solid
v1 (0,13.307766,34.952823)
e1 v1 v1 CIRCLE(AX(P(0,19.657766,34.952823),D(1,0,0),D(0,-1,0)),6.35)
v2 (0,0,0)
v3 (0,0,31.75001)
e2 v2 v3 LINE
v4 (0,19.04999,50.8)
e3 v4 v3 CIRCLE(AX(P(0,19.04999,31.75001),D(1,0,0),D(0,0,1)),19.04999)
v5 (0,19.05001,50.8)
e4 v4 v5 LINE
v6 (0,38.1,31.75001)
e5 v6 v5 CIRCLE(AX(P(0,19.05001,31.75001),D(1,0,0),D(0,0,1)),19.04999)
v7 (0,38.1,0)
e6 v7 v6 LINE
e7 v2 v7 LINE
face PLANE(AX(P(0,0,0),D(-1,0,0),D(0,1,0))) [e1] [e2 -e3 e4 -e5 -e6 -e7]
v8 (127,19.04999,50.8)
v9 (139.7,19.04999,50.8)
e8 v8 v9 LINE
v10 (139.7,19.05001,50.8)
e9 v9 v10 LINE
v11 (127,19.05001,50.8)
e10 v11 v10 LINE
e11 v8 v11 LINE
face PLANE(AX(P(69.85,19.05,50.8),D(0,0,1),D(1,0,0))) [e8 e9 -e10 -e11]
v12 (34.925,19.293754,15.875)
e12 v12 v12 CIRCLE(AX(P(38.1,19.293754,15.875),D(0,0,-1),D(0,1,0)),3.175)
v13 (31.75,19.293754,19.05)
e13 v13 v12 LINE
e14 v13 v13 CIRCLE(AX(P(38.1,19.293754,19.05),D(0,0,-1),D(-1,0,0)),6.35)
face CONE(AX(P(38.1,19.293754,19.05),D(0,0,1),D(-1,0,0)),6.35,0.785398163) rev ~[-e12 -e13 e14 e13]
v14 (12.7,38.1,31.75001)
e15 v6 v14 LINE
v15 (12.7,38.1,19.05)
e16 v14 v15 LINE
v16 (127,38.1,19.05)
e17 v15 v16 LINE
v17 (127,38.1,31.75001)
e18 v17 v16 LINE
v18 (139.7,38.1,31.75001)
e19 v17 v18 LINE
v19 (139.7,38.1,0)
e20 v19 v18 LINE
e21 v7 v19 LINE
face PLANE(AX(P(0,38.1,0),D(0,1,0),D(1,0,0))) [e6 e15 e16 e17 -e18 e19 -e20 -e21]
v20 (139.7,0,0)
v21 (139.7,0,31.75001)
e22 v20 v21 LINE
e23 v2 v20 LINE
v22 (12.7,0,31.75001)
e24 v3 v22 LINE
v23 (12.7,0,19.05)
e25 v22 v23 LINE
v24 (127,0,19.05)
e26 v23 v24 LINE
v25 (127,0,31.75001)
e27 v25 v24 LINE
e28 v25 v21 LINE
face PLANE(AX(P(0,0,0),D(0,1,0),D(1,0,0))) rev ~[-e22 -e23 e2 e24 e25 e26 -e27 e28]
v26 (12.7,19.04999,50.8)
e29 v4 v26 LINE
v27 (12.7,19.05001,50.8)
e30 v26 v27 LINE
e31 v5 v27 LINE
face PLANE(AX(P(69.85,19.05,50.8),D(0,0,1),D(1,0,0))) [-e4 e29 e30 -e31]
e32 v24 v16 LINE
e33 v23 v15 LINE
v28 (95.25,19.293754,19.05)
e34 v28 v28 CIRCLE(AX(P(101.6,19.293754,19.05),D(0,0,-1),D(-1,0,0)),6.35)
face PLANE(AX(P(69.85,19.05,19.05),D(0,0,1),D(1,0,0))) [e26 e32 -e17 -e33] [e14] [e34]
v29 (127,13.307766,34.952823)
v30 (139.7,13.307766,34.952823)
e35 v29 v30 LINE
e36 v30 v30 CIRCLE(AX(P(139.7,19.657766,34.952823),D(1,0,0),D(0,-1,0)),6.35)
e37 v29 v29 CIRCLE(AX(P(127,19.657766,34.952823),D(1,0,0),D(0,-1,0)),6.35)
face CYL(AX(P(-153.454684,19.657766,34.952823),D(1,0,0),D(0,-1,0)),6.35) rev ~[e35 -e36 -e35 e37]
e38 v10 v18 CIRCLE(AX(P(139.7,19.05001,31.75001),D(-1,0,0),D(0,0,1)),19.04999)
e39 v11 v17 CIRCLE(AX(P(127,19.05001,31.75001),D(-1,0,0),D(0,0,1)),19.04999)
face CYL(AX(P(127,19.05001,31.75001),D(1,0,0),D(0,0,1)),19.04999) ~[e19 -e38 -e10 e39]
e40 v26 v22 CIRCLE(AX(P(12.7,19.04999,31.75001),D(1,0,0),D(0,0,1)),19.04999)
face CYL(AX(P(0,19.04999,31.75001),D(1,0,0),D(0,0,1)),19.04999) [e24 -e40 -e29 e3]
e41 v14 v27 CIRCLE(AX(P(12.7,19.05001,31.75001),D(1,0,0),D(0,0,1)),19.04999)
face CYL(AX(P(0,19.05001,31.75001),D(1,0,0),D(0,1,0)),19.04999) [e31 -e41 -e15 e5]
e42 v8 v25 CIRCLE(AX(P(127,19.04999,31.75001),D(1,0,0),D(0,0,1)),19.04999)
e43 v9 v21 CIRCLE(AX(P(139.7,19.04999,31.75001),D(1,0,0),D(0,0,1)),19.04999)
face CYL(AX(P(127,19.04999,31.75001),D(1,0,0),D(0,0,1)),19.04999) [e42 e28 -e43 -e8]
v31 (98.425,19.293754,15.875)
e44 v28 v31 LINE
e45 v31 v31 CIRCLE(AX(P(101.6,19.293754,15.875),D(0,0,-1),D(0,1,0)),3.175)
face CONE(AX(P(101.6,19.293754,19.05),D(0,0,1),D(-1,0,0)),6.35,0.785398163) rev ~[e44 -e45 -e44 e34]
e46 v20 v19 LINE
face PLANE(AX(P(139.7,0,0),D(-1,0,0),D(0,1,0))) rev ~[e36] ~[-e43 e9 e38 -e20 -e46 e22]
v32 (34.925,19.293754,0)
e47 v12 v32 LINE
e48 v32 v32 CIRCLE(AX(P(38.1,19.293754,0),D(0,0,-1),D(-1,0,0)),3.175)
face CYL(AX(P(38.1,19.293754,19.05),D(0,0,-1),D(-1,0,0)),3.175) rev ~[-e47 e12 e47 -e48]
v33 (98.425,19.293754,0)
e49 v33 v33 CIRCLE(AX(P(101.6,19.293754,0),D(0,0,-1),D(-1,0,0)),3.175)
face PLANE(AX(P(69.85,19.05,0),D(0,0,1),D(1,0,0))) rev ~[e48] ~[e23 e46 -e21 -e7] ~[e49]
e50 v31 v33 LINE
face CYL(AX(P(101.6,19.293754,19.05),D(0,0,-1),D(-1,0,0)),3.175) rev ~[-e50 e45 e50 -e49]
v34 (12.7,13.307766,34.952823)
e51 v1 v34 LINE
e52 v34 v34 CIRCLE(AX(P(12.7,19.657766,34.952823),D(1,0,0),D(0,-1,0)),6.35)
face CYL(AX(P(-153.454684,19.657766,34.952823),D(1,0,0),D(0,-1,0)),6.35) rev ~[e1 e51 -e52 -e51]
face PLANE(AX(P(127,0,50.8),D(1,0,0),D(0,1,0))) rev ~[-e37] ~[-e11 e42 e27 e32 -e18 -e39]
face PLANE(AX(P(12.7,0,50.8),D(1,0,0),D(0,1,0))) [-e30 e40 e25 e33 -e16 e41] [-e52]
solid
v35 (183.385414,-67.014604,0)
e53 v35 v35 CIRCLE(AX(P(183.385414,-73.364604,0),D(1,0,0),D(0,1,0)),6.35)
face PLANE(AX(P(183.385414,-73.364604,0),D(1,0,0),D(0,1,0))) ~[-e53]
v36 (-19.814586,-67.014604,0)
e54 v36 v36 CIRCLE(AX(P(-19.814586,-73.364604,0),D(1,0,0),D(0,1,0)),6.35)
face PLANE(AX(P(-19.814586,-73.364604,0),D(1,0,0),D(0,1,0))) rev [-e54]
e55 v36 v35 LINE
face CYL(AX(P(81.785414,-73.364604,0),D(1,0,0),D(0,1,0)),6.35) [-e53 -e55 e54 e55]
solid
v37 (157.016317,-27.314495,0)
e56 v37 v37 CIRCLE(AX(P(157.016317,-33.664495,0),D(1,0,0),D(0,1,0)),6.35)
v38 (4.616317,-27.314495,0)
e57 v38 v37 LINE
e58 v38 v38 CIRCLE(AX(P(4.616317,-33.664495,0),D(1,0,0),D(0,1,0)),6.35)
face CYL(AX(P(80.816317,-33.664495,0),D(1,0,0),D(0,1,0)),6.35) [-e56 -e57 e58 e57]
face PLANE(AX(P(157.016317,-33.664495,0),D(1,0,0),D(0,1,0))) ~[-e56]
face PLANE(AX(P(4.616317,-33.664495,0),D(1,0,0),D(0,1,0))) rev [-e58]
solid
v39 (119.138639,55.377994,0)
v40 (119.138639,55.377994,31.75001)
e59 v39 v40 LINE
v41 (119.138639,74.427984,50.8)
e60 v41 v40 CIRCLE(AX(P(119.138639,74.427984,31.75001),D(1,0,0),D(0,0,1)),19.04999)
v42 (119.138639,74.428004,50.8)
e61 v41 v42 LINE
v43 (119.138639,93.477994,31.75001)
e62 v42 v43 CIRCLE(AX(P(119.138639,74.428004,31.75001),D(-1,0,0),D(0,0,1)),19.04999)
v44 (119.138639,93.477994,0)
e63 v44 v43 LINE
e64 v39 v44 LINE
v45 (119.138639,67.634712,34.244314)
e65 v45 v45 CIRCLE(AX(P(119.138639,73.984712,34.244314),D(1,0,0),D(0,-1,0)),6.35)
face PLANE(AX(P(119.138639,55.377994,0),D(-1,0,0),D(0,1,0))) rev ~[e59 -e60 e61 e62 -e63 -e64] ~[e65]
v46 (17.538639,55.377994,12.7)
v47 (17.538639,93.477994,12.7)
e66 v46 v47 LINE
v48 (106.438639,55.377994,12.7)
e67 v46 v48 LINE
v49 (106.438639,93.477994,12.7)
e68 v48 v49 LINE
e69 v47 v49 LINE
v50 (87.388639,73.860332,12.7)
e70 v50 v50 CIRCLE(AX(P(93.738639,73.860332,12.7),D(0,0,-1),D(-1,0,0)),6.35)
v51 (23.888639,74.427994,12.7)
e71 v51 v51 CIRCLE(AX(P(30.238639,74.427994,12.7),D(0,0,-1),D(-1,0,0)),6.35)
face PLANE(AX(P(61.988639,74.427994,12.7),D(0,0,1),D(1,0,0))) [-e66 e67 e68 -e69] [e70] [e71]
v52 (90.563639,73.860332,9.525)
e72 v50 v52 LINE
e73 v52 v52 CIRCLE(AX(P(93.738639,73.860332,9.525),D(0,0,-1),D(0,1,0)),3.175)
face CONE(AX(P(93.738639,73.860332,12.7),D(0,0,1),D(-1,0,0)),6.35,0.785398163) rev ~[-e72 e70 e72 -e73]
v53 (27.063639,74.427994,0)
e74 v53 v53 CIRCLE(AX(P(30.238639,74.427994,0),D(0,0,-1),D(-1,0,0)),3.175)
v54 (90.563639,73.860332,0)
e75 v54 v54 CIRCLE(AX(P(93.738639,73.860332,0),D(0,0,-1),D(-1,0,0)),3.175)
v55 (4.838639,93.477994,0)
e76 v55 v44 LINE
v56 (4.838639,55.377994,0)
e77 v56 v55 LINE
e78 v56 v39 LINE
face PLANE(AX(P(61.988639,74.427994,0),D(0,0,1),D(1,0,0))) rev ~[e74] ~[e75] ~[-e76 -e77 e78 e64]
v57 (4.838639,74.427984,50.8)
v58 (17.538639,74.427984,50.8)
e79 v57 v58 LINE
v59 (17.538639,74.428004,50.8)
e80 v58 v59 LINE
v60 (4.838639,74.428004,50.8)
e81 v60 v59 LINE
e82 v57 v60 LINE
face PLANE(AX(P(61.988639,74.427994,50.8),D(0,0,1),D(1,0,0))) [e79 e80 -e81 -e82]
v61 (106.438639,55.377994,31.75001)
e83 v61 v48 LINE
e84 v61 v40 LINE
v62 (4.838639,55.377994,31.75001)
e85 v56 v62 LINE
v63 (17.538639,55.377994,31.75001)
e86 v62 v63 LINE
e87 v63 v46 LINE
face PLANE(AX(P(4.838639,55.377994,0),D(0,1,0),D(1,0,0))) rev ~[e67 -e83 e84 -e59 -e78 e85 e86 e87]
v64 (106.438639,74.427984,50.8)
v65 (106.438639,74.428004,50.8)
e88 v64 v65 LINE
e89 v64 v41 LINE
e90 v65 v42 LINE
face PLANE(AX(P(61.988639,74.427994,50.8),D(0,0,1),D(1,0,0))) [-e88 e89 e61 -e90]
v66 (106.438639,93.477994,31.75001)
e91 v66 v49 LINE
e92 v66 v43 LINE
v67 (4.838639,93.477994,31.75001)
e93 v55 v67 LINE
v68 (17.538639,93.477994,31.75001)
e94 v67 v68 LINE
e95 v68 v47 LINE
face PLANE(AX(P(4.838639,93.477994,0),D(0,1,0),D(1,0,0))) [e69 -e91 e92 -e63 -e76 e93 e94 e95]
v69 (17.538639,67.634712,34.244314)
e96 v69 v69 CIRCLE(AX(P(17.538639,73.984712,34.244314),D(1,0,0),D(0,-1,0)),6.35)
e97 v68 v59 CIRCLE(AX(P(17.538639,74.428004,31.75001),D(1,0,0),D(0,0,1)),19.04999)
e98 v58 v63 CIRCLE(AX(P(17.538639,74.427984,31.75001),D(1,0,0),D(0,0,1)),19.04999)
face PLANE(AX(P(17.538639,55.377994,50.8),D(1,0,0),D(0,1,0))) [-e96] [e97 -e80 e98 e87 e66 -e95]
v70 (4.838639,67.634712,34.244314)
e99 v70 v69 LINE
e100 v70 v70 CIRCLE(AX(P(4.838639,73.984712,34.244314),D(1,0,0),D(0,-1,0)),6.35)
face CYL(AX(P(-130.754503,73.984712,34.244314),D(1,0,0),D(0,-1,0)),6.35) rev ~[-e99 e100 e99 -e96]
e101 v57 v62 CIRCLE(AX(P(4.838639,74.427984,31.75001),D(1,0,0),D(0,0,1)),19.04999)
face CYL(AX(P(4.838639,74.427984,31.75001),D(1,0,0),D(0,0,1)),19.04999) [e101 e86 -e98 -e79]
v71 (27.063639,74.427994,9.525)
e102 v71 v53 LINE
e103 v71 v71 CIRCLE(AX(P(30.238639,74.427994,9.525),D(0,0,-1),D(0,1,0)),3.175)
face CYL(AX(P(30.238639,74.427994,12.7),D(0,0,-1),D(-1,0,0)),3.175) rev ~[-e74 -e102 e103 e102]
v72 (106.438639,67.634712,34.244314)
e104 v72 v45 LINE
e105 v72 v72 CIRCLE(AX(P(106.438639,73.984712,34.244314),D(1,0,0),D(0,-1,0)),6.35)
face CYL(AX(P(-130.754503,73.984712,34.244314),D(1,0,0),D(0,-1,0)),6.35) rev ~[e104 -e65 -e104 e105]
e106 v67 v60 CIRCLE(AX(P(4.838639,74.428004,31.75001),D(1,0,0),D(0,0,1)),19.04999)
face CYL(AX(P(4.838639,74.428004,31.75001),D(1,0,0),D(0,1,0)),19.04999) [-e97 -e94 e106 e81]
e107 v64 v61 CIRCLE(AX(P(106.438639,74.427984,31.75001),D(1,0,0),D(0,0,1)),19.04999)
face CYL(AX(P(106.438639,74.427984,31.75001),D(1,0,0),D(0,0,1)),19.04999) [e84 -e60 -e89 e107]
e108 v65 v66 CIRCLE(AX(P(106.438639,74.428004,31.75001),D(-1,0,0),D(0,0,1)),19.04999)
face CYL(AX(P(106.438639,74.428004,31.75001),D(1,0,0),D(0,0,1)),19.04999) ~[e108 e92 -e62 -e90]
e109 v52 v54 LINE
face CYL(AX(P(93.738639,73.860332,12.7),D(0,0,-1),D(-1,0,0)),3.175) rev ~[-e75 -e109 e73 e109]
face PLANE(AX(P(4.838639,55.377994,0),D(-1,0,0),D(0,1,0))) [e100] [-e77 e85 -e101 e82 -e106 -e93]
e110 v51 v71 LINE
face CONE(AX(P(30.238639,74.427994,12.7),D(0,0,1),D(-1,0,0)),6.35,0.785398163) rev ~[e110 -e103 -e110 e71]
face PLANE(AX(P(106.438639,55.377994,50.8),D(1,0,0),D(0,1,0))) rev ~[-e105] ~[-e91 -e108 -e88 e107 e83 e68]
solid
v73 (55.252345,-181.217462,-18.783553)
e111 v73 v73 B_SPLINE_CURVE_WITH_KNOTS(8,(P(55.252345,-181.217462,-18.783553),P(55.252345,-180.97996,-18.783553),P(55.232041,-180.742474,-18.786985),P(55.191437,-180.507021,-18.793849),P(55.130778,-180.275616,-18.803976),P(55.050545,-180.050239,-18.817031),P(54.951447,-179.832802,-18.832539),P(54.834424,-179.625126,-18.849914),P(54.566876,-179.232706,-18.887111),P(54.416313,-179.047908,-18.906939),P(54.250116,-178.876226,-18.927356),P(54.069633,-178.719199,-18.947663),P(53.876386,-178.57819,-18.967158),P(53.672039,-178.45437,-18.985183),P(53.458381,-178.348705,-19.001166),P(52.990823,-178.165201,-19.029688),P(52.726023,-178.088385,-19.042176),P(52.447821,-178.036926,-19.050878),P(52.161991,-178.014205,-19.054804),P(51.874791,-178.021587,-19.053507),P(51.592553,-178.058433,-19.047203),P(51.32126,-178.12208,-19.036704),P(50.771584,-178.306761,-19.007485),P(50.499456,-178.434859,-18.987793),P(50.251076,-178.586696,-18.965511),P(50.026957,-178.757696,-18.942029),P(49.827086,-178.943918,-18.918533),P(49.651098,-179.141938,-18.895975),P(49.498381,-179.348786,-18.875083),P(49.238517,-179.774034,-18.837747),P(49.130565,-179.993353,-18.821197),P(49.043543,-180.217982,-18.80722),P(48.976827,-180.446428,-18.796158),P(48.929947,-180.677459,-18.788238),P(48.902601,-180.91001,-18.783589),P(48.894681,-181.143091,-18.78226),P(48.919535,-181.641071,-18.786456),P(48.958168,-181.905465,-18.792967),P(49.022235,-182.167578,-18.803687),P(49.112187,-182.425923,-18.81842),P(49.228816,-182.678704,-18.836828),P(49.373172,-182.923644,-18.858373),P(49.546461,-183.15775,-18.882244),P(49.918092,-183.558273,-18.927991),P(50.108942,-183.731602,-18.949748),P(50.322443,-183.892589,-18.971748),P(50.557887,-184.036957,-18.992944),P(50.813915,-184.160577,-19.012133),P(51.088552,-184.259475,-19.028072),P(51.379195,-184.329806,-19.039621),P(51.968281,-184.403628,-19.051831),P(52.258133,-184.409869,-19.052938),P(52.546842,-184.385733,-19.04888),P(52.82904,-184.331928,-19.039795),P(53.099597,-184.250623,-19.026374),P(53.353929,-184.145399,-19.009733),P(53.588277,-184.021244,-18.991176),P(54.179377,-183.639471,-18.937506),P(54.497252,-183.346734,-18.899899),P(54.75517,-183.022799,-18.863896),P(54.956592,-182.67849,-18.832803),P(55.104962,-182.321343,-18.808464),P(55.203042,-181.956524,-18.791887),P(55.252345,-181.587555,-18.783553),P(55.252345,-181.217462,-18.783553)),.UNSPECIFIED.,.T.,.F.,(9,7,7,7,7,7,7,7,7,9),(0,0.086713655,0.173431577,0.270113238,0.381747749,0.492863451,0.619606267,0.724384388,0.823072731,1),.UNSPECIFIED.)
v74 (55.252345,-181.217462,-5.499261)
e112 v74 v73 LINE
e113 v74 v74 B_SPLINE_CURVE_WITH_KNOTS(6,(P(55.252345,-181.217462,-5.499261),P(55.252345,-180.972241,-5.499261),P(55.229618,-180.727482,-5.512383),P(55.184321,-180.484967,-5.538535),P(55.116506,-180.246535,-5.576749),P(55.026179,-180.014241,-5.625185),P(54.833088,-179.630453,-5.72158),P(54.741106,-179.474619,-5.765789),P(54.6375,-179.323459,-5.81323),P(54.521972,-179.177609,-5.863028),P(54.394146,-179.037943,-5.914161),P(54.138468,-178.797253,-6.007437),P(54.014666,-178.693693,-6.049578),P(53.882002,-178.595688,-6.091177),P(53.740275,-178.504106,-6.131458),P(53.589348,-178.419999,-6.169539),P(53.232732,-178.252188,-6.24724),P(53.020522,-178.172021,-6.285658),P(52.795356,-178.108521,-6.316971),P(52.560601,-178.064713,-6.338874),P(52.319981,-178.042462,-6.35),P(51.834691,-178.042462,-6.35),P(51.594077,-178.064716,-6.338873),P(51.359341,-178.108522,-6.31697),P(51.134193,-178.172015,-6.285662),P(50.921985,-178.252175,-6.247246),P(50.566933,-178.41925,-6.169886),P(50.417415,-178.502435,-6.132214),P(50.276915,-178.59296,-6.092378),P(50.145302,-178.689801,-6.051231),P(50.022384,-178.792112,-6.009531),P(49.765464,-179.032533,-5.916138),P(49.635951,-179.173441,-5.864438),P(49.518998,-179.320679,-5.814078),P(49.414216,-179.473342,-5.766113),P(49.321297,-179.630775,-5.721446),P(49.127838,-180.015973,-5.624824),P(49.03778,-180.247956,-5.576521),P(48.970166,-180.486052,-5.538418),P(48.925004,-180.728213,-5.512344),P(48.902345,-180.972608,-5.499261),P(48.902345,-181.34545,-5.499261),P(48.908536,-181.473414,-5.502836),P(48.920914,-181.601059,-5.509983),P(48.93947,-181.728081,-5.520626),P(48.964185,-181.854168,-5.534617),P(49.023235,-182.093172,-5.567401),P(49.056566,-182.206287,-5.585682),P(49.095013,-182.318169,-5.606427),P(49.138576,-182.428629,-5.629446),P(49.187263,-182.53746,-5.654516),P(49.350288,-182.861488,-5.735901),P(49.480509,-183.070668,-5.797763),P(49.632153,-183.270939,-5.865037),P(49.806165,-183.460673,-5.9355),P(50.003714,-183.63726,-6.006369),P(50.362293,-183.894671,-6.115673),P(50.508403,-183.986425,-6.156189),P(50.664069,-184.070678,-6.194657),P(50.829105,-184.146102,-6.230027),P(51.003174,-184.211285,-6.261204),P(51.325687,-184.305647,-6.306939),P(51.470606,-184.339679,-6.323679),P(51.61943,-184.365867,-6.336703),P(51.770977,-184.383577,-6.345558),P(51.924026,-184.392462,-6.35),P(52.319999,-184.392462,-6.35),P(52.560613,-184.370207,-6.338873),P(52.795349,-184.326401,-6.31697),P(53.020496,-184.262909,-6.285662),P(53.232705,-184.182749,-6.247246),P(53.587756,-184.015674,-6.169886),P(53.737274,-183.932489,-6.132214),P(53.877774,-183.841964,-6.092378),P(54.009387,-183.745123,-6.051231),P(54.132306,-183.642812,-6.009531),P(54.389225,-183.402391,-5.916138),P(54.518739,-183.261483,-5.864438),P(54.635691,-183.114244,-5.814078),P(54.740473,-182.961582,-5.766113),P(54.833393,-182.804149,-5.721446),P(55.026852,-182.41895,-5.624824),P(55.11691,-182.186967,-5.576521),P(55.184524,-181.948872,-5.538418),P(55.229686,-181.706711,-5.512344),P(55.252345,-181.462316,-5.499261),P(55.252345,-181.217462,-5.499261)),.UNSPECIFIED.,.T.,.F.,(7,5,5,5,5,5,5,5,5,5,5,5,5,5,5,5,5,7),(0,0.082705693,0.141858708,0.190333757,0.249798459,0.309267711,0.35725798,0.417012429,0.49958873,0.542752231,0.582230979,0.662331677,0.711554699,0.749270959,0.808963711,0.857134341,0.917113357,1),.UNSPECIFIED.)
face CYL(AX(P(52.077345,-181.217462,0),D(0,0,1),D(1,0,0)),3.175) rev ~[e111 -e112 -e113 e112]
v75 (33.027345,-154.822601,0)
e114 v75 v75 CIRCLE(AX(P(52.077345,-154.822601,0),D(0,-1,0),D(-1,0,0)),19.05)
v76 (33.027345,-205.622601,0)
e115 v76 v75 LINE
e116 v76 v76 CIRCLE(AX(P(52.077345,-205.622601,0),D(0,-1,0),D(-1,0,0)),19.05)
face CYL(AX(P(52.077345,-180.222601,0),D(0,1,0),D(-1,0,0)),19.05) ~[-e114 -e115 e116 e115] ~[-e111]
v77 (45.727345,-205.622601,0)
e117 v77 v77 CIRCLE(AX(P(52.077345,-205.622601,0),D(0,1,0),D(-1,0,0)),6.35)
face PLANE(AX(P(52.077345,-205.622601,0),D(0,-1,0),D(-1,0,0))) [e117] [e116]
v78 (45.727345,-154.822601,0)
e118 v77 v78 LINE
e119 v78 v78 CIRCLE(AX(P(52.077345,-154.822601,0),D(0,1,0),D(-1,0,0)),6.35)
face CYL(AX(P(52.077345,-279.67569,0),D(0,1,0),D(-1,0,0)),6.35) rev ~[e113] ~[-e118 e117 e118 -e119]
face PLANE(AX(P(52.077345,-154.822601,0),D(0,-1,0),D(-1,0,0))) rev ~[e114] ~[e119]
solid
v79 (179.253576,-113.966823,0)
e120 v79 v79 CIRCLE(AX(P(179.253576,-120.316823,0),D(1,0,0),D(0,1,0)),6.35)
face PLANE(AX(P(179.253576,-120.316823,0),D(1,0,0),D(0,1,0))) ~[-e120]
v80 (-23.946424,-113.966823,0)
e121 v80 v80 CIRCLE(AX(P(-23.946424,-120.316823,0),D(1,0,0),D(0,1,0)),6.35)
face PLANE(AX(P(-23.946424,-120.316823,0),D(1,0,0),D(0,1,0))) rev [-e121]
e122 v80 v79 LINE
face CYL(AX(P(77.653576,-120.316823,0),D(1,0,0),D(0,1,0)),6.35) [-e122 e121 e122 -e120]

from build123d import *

# Parameters (mm, degrees)
F0_W            = 139.7
F0_H            = 38.1
F1_DEPTH        = 50.8
F2_W            = 114.3
F2_H            = 38.1
F3_DEPTH        = 31.75
F5_D            = 12.7
F7_D            = 6.35
F7_CSINK_D      = 12.7
F7_CSINK_ANGLE  = 90
F8_D            = 6.35
F8_CSINK_D      = 12.7
F8_CSINK_ANGLE  = 90
F9_W            = 114.3
F9_H            = 38.1
F10_DEPTH       = 50.8
F11_W           = 88.9
F11_H           = 38.1
F12_DEPTH       = 38.1
F14_D           = 12.7
F16_D           = 6.35
F16_CSINK_D     = 12.7
F16_CSINK_ANGLE = 90
F17_W           = 152.4
F17_H           = 6.35
F19_R           = 19.04999
F19_2_R         = 19.04999
F20_W           = 203.2
F20_H           = 6.35
F22_W           = 203.2
F22_H           = 6.35
F24_W           = 19.05
F24_H           = 50.8
F27_D           = 6.35
F27_DEPTH       = 19.051
F28_D           = 12.7


# Not quite as in the source:
# - a fillet or chamfer is up to 0.001 mm smaller than in the source, because OpenCascade refuses the exact size


with BuildPart() as f1:
    # F0 (on Top) → F1 (new body)
    with BuildSketch(Plane.XY):
        with Locations((69.85, 19.05)):
            Rectangle(F0_W, F0_H)
    extrude(amount=F1_DEPTH)

    # F2 (on face) → F3 (cut)
    with BuildSketch(Plane.XY.offset(50.8)):
        with Locations((69.85, 19.05)):
            Rectangle(F2_W, F2_H)
    extrude(amount=-F3_DEPTH, mode=Mode.SUBTRACT)

    # F5 (through all)
    with Locations(Plane(origin=(0, 0, 0), x_dir=(0, 1, 0), z_dir=(-1, 0, 0))):
        with Locations((19.6577664465, -34.9528230727)):
            Hole(F5_D / 2)

    # F7 (through all)
    with Locations(Plane.XY.offset(19.05)):
        with Locations((38.1, 19.2937536606)):
            CounterSinkHole(F7_D / 2, F7_CSINK_D / 2, counter_sink_angle=F7_CSINK_ANGLE)

    # F8 (through all)
    with Locations(Plane.XY.offset(19.05)):
        with Locations((101.6, 19.2937536606)):
            CounterSinkHole(F8_D / 2, F8_CSINK_D / 2, counter_sink_angle=F8_CSINK_ANGLE)

    # F19#2 (radius 19.05 in the source; OpenCascade refuses exactly that, so slightly less here)
    f19_2_edges = [f1.edges().sort_by_distance(p)[0] for p in [
        (6.35, 38.1, 50.8),
        (6.35, 0, 50.8),
        (133.35, 38.1, 50.8),
        (133.35, 0, 50.8),
    ]]
    fillet(f19_2_edges, radius=F19_2_R)


with BuildPart() as f10:
    # F9 (on Top) → F10 (new body)
    with BuildSketch(Plane.XY):
        with Locations((61.9886387933, 74.4279935342)):
            Rectangle(F9_W, F9_H)
    extrude(amount=F10_DEPTH)

    # F11 (on face) → F12 (cut)
    with BuildSketch(Plane.XY.offset(50.8)):
        with Locations((61.9886387933, 74.4279935342)):
            Rectangle(F11_W, F11_H)
    extrude(amount=-F12_DEPTH, mode=Mode.SUBTRACT)

    # F14 (through all)
    with Locations(Plane(origin=(0, 0, 0), x_dir=(0, 1, 0), z_dir=(-1, 0, 0))):
        with Locations((73.9847123623, -34.2443138361)):
            Hole(F14_D / 2)

    # F16 (through all)
    with Locations(Plane.XY.offset(12.7)):
        with Locations((30.2386387933, 74.4279935342), (93.7386387933, 73.8603323698)):
            CounterSinkHole(F16_D / 2, F16_CSINK_D / 2, counter_sink_angle=F16_CSINK_ANGLE)

    # F19 (radius 19.05 in the source; OpenCascade refuses exactly that, so slightly less here)
    f19_edges = [f10.edges().sort_by_distance(p)[0] for p in [
        (11.188639, 93.477994, 50.8),
        (11.188639, 55.377994, 50.8),
        (112.788639, 55.377994, 50.8),
        (112.788639, 93.477994, 50.8),
    ]]
    fillet(f19_edges, radius=F19_R)


with BuildPart() as f18:
    # F17 (on Top) → F18 (revolve)
    with BuildSketch(Plane.XY):
        with Locations((80.8163173497, -30.4894949675)):
            Rectangle(F17_W, F17_H)
    revolve(axis=Axis((80.8163173497, -33.6644949675, 0), (1, 0, 0)))


with BuildPart() as f21:
    # F20 (on Top) → F21 (revolve)
    with BuildSketch(Plane.XY):
        with Locations((81.7854143679, -70.1896044196)):
            Rectangle(F20_W, F20_H)
    revolve(axis=Axis((81.7854143679, -73.3646044196, 0), (1, 0, 0)))


with BuildPart() as f23:
    # F22 (on Top) → F23 (revolve)
    with BuildSketch(Plane.XY):
        with Locations((77.6535756886, -117.141823427)):
            Rectangle(F22_W, F22_H)
    revolve(axis=Axis((77.6535756886, -120.316823427, 0), (1, 0, 0)))


with BuildPart() as f25:
    # F24 (on Top) → F25 (revolve)
    with BuildSketch(Plane.XY):
        with Locations((42.55234483, -180.2226006985)):
            Rectangle(F24_W, F24_H)
    revolve(axis=Axis((52.07734483, -180.2226006985, 0), (0, -1, 0)))

    # F27 (through all, one way)
    with BuildSketch(Plane.XY):
        with Locations((52.07734483, -181.2174618244)):
            Circle(F27_D / 2)
    extrude(amount=-F27_DEPTH, mode=Mode.SUBTRACT)

    # F28 (through all)
    with Locations(Plane.XZ.offset(205.6226006985)):
        with Locations((52.07734483, 0)):
            Hole(F28_D / 2)


solid = Compound([f1.part, f10.part, f18.part, f21.part, f23.part, f25.part])
